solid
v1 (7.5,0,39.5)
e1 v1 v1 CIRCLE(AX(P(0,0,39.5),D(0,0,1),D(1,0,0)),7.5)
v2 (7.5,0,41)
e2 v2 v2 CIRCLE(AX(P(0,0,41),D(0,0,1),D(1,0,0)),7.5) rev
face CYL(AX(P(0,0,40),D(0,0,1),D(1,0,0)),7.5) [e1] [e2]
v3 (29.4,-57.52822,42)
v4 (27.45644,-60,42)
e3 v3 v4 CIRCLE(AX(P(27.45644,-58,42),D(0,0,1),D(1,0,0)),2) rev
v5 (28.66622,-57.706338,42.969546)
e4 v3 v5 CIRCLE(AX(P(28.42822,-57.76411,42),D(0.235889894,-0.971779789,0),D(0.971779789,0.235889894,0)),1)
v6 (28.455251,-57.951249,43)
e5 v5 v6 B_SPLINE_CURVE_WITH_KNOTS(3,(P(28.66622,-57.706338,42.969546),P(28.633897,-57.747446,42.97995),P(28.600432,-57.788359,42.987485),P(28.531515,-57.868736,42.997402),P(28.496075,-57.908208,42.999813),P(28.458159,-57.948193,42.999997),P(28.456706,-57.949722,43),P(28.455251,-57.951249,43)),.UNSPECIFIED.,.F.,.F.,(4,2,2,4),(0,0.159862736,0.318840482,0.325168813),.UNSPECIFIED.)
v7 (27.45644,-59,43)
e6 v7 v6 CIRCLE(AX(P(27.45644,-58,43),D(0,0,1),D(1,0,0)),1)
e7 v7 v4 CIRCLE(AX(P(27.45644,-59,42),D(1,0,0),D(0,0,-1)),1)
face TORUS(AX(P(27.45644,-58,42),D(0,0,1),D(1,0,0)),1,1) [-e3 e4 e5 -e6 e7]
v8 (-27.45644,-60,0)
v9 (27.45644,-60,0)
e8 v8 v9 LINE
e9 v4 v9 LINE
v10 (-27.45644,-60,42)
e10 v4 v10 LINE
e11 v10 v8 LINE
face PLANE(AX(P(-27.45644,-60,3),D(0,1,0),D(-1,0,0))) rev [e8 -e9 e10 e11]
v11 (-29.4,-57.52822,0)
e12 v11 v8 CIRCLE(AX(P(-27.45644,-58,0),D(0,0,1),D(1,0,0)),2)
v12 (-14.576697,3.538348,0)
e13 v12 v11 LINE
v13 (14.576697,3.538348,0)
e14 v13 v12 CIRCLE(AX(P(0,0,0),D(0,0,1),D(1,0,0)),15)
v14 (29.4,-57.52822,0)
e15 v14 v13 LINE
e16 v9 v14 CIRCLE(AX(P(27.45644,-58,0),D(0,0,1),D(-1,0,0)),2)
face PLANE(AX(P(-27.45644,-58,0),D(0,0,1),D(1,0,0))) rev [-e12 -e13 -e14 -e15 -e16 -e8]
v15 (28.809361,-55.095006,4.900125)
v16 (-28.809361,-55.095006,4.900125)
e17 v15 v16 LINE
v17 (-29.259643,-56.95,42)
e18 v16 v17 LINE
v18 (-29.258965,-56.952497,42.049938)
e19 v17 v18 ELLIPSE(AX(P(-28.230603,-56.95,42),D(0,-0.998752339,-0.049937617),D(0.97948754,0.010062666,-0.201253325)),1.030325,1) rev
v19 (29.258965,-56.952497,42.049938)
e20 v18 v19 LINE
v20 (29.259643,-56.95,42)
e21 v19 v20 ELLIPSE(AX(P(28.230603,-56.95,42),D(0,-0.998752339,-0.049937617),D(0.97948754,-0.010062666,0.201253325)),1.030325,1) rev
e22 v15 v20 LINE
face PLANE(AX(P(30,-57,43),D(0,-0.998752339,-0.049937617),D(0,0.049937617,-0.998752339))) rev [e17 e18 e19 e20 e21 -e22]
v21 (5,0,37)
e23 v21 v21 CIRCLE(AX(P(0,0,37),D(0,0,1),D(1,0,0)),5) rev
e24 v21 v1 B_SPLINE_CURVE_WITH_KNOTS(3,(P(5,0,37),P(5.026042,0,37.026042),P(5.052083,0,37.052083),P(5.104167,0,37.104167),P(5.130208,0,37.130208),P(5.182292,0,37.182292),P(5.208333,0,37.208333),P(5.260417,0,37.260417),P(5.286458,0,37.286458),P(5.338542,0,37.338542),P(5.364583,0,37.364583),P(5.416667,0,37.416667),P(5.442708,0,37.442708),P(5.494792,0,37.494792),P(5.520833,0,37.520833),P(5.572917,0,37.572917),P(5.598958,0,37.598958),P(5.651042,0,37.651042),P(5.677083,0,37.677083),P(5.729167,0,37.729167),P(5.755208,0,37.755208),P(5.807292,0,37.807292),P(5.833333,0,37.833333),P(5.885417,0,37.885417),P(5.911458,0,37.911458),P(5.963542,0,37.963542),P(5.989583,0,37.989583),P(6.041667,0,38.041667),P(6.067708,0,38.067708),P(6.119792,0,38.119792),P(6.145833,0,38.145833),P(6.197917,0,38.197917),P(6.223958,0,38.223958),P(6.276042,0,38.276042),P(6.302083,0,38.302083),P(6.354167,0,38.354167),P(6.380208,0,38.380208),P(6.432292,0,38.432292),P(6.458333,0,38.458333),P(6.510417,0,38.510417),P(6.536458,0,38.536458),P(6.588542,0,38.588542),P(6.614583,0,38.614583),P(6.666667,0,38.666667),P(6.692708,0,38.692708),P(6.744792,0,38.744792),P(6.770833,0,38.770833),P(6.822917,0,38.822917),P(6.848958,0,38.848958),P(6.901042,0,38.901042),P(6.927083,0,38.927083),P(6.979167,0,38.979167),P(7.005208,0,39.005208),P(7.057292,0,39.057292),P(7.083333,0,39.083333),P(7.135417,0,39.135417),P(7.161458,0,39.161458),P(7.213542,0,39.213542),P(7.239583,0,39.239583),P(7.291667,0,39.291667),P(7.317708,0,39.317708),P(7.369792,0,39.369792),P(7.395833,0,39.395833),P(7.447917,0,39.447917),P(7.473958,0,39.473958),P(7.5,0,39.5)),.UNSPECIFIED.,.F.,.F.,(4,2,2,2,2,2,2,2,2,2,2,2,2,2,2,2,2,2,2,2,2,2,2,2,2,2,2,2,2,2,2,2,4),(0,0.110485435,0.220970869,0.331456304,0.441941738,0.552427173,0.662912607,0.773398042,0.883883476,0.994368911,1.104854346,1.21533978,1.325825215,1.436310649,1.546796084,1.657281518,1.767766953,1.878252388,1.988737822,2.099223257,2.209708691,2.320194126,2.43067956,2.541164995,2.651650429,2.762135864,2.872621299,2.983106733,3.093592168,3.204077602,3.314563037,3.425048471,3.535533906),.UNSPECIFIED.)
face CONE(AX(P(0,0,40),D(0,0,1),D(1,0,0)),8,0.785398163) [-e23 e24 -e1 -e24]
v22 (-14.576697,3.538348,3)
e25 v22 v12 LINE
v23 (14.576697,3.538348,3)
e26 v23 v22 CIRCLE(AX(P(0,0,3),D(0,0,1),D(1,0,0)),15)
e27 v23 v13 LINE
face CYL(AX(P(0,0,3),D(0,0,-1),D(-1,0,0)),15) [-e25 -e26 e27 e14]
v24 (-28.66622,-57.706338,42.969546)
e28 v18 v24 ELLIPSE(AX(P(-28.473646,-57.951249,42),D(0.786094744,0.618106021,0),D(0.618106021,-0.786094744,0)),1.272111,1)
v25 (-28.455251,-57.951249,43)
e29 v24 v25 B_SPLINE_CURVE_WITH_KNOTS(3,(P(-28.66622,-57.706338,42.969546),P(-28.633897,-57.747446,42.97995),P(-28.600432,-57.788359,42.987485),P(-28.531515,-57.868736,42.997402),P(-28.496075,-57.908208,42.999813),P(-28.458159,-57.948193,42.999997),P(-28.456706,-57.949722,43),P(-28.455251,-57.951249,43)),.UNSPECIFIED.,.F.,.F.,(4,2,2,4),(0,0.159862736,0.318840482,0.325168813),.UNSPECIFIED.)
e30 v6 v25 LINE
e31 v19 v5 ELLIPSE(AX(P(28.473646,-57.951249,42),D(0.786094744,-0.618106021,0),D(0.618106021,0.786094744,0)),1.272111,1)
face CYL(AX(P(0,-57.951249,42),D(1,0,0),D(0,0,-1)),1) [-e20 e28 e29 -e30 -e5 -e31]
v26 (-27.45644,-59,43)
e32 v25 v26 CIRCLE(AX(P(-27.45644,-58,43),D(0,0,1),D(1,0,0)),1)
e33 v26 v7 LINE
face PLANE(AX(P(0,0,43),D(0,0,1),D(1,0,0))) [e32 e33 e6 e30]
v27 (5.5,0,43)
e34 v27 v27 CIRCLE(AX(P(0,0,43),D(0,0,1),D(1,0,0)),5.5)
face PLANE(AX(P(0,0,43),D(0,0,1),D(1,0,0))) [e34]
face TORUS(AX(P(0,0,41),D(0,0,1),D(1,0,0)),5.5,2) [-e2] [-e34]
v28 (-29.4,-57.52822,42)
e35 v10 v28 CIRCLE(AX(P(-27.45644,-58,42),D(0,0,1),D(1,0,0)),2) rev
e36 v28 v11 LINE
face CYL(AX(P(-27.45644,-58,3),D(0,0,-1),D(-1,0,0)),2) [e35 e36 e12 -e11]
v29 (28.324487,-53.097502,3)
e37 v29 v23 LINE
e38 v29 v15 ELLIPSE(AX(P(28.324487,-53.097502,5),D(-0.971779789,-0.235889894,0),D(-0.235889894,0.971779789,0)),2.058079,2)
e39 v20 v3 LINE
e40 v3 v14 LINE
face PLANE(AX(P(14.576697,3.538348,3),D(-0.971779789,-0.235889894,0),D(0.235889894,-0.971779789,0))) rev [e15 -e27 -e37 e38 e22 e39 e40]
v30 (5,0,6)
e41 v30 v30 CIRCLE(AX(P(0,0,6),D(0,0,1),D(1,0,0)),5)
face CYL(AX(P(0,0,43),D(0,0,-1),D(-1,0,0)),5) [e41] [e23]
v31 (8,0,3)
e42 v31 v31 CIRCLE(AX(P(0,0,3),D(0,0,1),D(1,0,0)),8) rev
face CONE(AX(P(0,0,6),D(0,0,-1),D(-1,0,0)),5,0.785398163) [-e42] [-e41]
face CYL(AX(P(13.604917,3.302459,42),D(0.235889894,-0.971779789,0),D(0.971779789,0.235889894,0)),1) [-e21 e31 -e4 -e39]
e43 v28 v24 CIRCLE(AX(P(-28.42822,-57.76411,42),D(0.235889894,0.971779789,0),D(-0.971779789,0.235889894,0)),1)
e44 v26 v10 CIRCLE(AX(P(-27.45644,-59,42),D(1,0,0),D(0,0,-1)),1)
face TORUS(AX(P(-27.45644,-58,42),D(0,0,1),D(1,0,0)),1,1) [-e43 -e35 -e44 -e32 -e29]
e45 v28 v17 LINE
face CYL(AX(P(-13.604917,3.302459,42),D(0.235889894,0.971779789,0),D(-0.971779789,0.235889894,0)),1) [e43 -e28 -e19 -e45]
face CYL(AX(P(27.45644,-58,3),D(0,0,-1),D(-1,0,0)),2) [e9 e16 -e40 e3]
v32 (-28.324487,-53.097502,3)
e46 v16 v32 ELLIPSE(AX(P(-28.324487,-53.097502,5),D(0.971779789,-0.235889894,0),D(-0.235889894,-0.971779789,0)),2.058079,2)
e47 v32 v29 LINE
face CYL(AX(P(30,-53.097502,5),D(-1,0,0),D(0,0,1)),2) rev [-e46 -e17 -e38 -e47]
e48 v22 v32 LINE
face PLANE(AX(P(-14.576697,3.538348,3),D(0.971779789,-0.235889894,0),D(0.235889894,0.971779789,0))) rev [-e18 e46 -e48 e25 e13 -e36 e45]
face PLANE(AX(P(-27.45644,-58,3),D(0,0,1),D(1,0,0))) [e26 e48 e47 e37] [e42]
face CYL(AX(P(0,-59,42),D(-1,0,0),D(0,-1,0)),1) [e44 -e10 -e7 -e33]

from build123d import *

# Parameters (mm, degrees)
EXTRUDE_1_DEPTH      = 3
SKETCH_2_R           = 5
EXTRUDE_2_DEPTH      = 40
SKETCH_3_R           = 7.5
EXTRUDE_3_DEPTH      = 3
CHAMFER_1_SIZE       = 3
EXTRUDE_4_DEPTH      = 40
EXTRUDE_5_DEPTH      = 30
EXTRUDE_5_DEPTH_BACK = 30
SKETCH_1_2_OUTSIDE_W = 83.046
SKETCH_1_2_OUTSIDE_H = 98.046
CUT_EXTRUDE_1_DEPTH  = 80.680612447
FILLET_1_R           = 2
FILLET_2_R           = 1
FILLET_3_R           = 2


with BuildPart() as part:
    # 草图1 → 凸台-拉伸1 (new body)
    with BuildSketch(Plane.XY):
        with BuildLine():
            Line((-14.576696831, 3.538348415), (-29.4, -57.528220211))
            ThreePointArc((-29.4, -57.528220211), (-29.028629911, -59.236212041), (-27.456440423, -60))
            Line((-27.456440423, -60), (27.456440423, -60))
            ThreePointArc((27.456440423, -60), (29.028629911, -59.236212041), (29.4, -57.528220211))
            Line((29.4, -57.528220211), (14.576696831, 3.538348415))
            ThreePointArc((14.576696831, 3.538348415), (0, 15), (-14.576696831, 3.538348415))
        make_face()
    extrude(amount=EXTRUDE_1_DEPTH)

    # 草图2 → 凸台-拉伸2 (add)
    with BuildSketch(Plane.XY.offset(3)):
        Circle(SKETCH_2_R)
    extrude(amount=EXTRUDE_2_DEPTH)

    # 草图3 → 凸台-拉伸3 (add)
    with BuildSketch(Plane.XY.offset(43)):
        Circle(SKETCH_3_R)
    extrude(amount=-EXTRUDE_3_DEPTH)

    # 倒角1
    # the kernel refuses this chamfer: 3 mm, written as the material it adds along each edge
    with BuildSketch(Plane(origin=(0, 0, 40), x_dir=(1, 0, 0), z_dir=(0, 1, 0))) as chamfer_1_piece_1_section:
        Polygon((5, CHAMFER_1_SIZE), (5 + CHAMFER_1_SIZE, 0), (5, 0), align=None)
    chamfer_1_piece_1 = revolve(axis=Axis((0, 0, 40), (0, 0, -1)), mode=Mode.PRIVATE)
    chamfer_1_piece_1 = chamfer_1_piece_1 & Plane(origin=(0, 0, 38.247274928), x_dir=(1, 0, 0), z_dir=(0, 0, 1)) * Cylinder(7.5, 32, mode=Mode.PRIVATE)
    add(chamfer_1_piece_1)
    with BuildSketch(Plane(origin=(0, 0, 3), x_dir=(1, 0, 0), z_dir=(0, -1, 0))) as chamfer_1_piece_2:
        Polygon((5 + CHAMFER_1_SIZE, 0), (5, CHAMFER_1_SIZE), (5, 0), align=None)
    revolve(axis=Axis((0, 0, 3), (0, 0, 1)))

    # 草图4 → 凸台-拉伸4 (add)
    with BuildSketch(Plane.XY.offset(3)):
        with BuildLine():
            Line((-29.271779789, -57), (29.271779789, -57))
            Line((29.271779789, -57), (29.4, -57.528220211))
            ThreePointArc((29.4, -57.528220211), (29.028629911, -59.236212041), (27.456440423, -60))
            Line((27.456440423, -60), (-27.456440423, -60))
            ThreePointArc((-27.456440423, -60), (-29.028629911, -59.236212041), (-29.4, -57.528220211))
            Line((-29.4, -57.528220211), (-29.271779789, -57))
        make_face()
    extrude(amount=EXTRUDE_4_DEPTH)

    # 草图6 → 凸台-拉伸5 (add, two sides: drawn at the far end of the back side and taken through both)
    with BuildSketch(Plane(origin=(0, 0, 0), x_dir=(0, 0, -1), z_dir=(1, 0, 0)).offset(-EXTRUDE_5_DEPTH_BACK)):
        Polygon((-43, -57), (-3, -55), (-3, -57), align=None)
    extrude(amount=EXTRUDE_5_DEPTH + EXTRUDE_5_DEPTH_BACK)

    # 草图1<2> outside → 切除-拉伸1 (cut, through all)
    with BuildSketch(Plane.XY):
        with Locations((0, -22.5)):
            Rectangle(SKETCH_1_2_OUTSIDE_W, SKETCH_1_2_OUTSIDE_H)
        with BuildLine():
            Line((-14.576696831, 3.538348415), (-29.4, -57.528220211))
            ThreePointArc((-29.4, -57.528220211), (-29.028629911, -59.236212041), (-27.456440423, -60))
            Line((-27.456440423, -60), (27.456440423, -60))
            ThreePointArc((27.456440423, -60), (29.028629911, -59.236212041), (29.4, -57.528220211))
            Line((29.4, -57.528220211), (14.576696831, 3.538348415))
            ThreePointArc((14.576696831, 3.538348415), (0, 15), (-14.576696831, 3.538348415))
        make_face(mode=Mode.SUBTRACT)
    extrude(amount=CUT_EXTRUDE_1_DEPTH, mode=Mode.SUBTRACT)

    # 圆角1
    fillet_1_edges = [part.edges().sort_by_distance(p)[0] for p in [
        (0, -55, 3),
    ]]
    fillet(fillet_1_edges, radius=FILLET_1_R)

    # 圆角2
    # the kernel refuses this fillet: 1 mm, written as the material it takes off along each edge
    with BuildSketch(Plane(origin=(27.456440423, -58, 43), x_dir=(0.971779788708135, 0.23588989435406618, 0), z_dir=(-0.23588989435406618, 0.971779788708135, 0))) as fillet_2_piece_1:
        with BuildLine():
            CenterArc((2 - FILLET_2_R, FILLET_2_R), FILLET_2_R, 270, 90)
            Line((2, FILLET_2_R), (2, 0))
            Line((2, 0), (2 - FILLET_2_R, 0))
        make_face()
    revolve(axis=Axis((27.456440423, -58, 43), (0, 0, -1)), revolution_arc=103.644084795, mode=Mode.SUBTRACT)
    with BuildSketch(Plane(origin=(27.456440423, -60, 43), x_dir=(0, 1, 0), z_dir=(-1, 0, 0))) as fillet_2_piece_2:
        with BuildLine():
            CenterArc((FILLET_2_R, FILLET_2_R), FILLET_2_R, 180, 90)
            Line((0, FILLET_2_R), (0, 0))
            Line((0, 0), (FILLET_2_R, 0))
        make_face()
    extrude(amount=54.912880845, mode=Mode.SUBTRACT)
    with BuildSketch(Plane(origin=(-27.456440423, -58, 43), x_dir=(0, -1, 0), z_dir=(1, 0, 0))) as fillet_2_piece_3:
        with BuildLine():
            CenterArc((2 - FILLET_2_R, FILLET_2_R), FILLET_2_R, 270, 90)
            Line((2, FILLET_2_R), (2, 0))
            Line((2, 0), (2 - FILLET_2_R, 0))
        make_face()
    revolve(axis=Axis((-27.456440423, -58, 43), (0, 0, -1)), revolution_arc=103.644084795, mode=Mode.SUBTRACT)
    with BuildSketch(Plane(origin=(-31.649902838, -57, 43), x_dir=(0, 0.049937616943894474, -0.9987523388778445), z_dir=(1, 0, 0))) as fillet_2_piece_4:
        with BuildLine():
            CenterArc((FILLET_2_R * 0.951249219725, -FILLET_2_R), FILLET_2_R, 90, 87.137594774)
            Line((-FILLET_2_R * 0.0475031191528, -FILLET_2_R * 0.950062383056), (0, 0))
            Line((0, 0), (FILLET_2_R * 0.951249219725, 0))
        make_face()
    extrude(amount=63.299805676, mode=Mode.SUBTRACT)
    with BuildSketch(Plane(origin=(-29.4, -57.528220211, 43), x_dir=(0, 0, -1), z_dir=(0.23588989435405947, 0.9717797887081366, 0)), Plane(origin=(28.682055053, -54.570550528, 43), x_dir=(0, 0, -1), z_dir=(0.2358898943540625, -0.971779788708136, 0))) as fillet_2_piece_5:
        with BuildLine():
            CenterArc((FILLET_2_R, -FILLET_2_R), FILLET_2_R, 90, 90)
            Line((0, -FILLET_2_R), (0, 0))
            Line((0, 0), (FILLET_2_R, 0))
        make_face()
    extrude(amount=3.043559577, mode=Mode.SUBTRACT)

    # 圆角3
    fillet_3_edges = [part.edges().sort_by_distance(p)[0] for p in [
        (-7.5, 0, 43),
    ]]
    fillet(fillet_3_edges, radius=FILLET_3_R)


solid = part.part
